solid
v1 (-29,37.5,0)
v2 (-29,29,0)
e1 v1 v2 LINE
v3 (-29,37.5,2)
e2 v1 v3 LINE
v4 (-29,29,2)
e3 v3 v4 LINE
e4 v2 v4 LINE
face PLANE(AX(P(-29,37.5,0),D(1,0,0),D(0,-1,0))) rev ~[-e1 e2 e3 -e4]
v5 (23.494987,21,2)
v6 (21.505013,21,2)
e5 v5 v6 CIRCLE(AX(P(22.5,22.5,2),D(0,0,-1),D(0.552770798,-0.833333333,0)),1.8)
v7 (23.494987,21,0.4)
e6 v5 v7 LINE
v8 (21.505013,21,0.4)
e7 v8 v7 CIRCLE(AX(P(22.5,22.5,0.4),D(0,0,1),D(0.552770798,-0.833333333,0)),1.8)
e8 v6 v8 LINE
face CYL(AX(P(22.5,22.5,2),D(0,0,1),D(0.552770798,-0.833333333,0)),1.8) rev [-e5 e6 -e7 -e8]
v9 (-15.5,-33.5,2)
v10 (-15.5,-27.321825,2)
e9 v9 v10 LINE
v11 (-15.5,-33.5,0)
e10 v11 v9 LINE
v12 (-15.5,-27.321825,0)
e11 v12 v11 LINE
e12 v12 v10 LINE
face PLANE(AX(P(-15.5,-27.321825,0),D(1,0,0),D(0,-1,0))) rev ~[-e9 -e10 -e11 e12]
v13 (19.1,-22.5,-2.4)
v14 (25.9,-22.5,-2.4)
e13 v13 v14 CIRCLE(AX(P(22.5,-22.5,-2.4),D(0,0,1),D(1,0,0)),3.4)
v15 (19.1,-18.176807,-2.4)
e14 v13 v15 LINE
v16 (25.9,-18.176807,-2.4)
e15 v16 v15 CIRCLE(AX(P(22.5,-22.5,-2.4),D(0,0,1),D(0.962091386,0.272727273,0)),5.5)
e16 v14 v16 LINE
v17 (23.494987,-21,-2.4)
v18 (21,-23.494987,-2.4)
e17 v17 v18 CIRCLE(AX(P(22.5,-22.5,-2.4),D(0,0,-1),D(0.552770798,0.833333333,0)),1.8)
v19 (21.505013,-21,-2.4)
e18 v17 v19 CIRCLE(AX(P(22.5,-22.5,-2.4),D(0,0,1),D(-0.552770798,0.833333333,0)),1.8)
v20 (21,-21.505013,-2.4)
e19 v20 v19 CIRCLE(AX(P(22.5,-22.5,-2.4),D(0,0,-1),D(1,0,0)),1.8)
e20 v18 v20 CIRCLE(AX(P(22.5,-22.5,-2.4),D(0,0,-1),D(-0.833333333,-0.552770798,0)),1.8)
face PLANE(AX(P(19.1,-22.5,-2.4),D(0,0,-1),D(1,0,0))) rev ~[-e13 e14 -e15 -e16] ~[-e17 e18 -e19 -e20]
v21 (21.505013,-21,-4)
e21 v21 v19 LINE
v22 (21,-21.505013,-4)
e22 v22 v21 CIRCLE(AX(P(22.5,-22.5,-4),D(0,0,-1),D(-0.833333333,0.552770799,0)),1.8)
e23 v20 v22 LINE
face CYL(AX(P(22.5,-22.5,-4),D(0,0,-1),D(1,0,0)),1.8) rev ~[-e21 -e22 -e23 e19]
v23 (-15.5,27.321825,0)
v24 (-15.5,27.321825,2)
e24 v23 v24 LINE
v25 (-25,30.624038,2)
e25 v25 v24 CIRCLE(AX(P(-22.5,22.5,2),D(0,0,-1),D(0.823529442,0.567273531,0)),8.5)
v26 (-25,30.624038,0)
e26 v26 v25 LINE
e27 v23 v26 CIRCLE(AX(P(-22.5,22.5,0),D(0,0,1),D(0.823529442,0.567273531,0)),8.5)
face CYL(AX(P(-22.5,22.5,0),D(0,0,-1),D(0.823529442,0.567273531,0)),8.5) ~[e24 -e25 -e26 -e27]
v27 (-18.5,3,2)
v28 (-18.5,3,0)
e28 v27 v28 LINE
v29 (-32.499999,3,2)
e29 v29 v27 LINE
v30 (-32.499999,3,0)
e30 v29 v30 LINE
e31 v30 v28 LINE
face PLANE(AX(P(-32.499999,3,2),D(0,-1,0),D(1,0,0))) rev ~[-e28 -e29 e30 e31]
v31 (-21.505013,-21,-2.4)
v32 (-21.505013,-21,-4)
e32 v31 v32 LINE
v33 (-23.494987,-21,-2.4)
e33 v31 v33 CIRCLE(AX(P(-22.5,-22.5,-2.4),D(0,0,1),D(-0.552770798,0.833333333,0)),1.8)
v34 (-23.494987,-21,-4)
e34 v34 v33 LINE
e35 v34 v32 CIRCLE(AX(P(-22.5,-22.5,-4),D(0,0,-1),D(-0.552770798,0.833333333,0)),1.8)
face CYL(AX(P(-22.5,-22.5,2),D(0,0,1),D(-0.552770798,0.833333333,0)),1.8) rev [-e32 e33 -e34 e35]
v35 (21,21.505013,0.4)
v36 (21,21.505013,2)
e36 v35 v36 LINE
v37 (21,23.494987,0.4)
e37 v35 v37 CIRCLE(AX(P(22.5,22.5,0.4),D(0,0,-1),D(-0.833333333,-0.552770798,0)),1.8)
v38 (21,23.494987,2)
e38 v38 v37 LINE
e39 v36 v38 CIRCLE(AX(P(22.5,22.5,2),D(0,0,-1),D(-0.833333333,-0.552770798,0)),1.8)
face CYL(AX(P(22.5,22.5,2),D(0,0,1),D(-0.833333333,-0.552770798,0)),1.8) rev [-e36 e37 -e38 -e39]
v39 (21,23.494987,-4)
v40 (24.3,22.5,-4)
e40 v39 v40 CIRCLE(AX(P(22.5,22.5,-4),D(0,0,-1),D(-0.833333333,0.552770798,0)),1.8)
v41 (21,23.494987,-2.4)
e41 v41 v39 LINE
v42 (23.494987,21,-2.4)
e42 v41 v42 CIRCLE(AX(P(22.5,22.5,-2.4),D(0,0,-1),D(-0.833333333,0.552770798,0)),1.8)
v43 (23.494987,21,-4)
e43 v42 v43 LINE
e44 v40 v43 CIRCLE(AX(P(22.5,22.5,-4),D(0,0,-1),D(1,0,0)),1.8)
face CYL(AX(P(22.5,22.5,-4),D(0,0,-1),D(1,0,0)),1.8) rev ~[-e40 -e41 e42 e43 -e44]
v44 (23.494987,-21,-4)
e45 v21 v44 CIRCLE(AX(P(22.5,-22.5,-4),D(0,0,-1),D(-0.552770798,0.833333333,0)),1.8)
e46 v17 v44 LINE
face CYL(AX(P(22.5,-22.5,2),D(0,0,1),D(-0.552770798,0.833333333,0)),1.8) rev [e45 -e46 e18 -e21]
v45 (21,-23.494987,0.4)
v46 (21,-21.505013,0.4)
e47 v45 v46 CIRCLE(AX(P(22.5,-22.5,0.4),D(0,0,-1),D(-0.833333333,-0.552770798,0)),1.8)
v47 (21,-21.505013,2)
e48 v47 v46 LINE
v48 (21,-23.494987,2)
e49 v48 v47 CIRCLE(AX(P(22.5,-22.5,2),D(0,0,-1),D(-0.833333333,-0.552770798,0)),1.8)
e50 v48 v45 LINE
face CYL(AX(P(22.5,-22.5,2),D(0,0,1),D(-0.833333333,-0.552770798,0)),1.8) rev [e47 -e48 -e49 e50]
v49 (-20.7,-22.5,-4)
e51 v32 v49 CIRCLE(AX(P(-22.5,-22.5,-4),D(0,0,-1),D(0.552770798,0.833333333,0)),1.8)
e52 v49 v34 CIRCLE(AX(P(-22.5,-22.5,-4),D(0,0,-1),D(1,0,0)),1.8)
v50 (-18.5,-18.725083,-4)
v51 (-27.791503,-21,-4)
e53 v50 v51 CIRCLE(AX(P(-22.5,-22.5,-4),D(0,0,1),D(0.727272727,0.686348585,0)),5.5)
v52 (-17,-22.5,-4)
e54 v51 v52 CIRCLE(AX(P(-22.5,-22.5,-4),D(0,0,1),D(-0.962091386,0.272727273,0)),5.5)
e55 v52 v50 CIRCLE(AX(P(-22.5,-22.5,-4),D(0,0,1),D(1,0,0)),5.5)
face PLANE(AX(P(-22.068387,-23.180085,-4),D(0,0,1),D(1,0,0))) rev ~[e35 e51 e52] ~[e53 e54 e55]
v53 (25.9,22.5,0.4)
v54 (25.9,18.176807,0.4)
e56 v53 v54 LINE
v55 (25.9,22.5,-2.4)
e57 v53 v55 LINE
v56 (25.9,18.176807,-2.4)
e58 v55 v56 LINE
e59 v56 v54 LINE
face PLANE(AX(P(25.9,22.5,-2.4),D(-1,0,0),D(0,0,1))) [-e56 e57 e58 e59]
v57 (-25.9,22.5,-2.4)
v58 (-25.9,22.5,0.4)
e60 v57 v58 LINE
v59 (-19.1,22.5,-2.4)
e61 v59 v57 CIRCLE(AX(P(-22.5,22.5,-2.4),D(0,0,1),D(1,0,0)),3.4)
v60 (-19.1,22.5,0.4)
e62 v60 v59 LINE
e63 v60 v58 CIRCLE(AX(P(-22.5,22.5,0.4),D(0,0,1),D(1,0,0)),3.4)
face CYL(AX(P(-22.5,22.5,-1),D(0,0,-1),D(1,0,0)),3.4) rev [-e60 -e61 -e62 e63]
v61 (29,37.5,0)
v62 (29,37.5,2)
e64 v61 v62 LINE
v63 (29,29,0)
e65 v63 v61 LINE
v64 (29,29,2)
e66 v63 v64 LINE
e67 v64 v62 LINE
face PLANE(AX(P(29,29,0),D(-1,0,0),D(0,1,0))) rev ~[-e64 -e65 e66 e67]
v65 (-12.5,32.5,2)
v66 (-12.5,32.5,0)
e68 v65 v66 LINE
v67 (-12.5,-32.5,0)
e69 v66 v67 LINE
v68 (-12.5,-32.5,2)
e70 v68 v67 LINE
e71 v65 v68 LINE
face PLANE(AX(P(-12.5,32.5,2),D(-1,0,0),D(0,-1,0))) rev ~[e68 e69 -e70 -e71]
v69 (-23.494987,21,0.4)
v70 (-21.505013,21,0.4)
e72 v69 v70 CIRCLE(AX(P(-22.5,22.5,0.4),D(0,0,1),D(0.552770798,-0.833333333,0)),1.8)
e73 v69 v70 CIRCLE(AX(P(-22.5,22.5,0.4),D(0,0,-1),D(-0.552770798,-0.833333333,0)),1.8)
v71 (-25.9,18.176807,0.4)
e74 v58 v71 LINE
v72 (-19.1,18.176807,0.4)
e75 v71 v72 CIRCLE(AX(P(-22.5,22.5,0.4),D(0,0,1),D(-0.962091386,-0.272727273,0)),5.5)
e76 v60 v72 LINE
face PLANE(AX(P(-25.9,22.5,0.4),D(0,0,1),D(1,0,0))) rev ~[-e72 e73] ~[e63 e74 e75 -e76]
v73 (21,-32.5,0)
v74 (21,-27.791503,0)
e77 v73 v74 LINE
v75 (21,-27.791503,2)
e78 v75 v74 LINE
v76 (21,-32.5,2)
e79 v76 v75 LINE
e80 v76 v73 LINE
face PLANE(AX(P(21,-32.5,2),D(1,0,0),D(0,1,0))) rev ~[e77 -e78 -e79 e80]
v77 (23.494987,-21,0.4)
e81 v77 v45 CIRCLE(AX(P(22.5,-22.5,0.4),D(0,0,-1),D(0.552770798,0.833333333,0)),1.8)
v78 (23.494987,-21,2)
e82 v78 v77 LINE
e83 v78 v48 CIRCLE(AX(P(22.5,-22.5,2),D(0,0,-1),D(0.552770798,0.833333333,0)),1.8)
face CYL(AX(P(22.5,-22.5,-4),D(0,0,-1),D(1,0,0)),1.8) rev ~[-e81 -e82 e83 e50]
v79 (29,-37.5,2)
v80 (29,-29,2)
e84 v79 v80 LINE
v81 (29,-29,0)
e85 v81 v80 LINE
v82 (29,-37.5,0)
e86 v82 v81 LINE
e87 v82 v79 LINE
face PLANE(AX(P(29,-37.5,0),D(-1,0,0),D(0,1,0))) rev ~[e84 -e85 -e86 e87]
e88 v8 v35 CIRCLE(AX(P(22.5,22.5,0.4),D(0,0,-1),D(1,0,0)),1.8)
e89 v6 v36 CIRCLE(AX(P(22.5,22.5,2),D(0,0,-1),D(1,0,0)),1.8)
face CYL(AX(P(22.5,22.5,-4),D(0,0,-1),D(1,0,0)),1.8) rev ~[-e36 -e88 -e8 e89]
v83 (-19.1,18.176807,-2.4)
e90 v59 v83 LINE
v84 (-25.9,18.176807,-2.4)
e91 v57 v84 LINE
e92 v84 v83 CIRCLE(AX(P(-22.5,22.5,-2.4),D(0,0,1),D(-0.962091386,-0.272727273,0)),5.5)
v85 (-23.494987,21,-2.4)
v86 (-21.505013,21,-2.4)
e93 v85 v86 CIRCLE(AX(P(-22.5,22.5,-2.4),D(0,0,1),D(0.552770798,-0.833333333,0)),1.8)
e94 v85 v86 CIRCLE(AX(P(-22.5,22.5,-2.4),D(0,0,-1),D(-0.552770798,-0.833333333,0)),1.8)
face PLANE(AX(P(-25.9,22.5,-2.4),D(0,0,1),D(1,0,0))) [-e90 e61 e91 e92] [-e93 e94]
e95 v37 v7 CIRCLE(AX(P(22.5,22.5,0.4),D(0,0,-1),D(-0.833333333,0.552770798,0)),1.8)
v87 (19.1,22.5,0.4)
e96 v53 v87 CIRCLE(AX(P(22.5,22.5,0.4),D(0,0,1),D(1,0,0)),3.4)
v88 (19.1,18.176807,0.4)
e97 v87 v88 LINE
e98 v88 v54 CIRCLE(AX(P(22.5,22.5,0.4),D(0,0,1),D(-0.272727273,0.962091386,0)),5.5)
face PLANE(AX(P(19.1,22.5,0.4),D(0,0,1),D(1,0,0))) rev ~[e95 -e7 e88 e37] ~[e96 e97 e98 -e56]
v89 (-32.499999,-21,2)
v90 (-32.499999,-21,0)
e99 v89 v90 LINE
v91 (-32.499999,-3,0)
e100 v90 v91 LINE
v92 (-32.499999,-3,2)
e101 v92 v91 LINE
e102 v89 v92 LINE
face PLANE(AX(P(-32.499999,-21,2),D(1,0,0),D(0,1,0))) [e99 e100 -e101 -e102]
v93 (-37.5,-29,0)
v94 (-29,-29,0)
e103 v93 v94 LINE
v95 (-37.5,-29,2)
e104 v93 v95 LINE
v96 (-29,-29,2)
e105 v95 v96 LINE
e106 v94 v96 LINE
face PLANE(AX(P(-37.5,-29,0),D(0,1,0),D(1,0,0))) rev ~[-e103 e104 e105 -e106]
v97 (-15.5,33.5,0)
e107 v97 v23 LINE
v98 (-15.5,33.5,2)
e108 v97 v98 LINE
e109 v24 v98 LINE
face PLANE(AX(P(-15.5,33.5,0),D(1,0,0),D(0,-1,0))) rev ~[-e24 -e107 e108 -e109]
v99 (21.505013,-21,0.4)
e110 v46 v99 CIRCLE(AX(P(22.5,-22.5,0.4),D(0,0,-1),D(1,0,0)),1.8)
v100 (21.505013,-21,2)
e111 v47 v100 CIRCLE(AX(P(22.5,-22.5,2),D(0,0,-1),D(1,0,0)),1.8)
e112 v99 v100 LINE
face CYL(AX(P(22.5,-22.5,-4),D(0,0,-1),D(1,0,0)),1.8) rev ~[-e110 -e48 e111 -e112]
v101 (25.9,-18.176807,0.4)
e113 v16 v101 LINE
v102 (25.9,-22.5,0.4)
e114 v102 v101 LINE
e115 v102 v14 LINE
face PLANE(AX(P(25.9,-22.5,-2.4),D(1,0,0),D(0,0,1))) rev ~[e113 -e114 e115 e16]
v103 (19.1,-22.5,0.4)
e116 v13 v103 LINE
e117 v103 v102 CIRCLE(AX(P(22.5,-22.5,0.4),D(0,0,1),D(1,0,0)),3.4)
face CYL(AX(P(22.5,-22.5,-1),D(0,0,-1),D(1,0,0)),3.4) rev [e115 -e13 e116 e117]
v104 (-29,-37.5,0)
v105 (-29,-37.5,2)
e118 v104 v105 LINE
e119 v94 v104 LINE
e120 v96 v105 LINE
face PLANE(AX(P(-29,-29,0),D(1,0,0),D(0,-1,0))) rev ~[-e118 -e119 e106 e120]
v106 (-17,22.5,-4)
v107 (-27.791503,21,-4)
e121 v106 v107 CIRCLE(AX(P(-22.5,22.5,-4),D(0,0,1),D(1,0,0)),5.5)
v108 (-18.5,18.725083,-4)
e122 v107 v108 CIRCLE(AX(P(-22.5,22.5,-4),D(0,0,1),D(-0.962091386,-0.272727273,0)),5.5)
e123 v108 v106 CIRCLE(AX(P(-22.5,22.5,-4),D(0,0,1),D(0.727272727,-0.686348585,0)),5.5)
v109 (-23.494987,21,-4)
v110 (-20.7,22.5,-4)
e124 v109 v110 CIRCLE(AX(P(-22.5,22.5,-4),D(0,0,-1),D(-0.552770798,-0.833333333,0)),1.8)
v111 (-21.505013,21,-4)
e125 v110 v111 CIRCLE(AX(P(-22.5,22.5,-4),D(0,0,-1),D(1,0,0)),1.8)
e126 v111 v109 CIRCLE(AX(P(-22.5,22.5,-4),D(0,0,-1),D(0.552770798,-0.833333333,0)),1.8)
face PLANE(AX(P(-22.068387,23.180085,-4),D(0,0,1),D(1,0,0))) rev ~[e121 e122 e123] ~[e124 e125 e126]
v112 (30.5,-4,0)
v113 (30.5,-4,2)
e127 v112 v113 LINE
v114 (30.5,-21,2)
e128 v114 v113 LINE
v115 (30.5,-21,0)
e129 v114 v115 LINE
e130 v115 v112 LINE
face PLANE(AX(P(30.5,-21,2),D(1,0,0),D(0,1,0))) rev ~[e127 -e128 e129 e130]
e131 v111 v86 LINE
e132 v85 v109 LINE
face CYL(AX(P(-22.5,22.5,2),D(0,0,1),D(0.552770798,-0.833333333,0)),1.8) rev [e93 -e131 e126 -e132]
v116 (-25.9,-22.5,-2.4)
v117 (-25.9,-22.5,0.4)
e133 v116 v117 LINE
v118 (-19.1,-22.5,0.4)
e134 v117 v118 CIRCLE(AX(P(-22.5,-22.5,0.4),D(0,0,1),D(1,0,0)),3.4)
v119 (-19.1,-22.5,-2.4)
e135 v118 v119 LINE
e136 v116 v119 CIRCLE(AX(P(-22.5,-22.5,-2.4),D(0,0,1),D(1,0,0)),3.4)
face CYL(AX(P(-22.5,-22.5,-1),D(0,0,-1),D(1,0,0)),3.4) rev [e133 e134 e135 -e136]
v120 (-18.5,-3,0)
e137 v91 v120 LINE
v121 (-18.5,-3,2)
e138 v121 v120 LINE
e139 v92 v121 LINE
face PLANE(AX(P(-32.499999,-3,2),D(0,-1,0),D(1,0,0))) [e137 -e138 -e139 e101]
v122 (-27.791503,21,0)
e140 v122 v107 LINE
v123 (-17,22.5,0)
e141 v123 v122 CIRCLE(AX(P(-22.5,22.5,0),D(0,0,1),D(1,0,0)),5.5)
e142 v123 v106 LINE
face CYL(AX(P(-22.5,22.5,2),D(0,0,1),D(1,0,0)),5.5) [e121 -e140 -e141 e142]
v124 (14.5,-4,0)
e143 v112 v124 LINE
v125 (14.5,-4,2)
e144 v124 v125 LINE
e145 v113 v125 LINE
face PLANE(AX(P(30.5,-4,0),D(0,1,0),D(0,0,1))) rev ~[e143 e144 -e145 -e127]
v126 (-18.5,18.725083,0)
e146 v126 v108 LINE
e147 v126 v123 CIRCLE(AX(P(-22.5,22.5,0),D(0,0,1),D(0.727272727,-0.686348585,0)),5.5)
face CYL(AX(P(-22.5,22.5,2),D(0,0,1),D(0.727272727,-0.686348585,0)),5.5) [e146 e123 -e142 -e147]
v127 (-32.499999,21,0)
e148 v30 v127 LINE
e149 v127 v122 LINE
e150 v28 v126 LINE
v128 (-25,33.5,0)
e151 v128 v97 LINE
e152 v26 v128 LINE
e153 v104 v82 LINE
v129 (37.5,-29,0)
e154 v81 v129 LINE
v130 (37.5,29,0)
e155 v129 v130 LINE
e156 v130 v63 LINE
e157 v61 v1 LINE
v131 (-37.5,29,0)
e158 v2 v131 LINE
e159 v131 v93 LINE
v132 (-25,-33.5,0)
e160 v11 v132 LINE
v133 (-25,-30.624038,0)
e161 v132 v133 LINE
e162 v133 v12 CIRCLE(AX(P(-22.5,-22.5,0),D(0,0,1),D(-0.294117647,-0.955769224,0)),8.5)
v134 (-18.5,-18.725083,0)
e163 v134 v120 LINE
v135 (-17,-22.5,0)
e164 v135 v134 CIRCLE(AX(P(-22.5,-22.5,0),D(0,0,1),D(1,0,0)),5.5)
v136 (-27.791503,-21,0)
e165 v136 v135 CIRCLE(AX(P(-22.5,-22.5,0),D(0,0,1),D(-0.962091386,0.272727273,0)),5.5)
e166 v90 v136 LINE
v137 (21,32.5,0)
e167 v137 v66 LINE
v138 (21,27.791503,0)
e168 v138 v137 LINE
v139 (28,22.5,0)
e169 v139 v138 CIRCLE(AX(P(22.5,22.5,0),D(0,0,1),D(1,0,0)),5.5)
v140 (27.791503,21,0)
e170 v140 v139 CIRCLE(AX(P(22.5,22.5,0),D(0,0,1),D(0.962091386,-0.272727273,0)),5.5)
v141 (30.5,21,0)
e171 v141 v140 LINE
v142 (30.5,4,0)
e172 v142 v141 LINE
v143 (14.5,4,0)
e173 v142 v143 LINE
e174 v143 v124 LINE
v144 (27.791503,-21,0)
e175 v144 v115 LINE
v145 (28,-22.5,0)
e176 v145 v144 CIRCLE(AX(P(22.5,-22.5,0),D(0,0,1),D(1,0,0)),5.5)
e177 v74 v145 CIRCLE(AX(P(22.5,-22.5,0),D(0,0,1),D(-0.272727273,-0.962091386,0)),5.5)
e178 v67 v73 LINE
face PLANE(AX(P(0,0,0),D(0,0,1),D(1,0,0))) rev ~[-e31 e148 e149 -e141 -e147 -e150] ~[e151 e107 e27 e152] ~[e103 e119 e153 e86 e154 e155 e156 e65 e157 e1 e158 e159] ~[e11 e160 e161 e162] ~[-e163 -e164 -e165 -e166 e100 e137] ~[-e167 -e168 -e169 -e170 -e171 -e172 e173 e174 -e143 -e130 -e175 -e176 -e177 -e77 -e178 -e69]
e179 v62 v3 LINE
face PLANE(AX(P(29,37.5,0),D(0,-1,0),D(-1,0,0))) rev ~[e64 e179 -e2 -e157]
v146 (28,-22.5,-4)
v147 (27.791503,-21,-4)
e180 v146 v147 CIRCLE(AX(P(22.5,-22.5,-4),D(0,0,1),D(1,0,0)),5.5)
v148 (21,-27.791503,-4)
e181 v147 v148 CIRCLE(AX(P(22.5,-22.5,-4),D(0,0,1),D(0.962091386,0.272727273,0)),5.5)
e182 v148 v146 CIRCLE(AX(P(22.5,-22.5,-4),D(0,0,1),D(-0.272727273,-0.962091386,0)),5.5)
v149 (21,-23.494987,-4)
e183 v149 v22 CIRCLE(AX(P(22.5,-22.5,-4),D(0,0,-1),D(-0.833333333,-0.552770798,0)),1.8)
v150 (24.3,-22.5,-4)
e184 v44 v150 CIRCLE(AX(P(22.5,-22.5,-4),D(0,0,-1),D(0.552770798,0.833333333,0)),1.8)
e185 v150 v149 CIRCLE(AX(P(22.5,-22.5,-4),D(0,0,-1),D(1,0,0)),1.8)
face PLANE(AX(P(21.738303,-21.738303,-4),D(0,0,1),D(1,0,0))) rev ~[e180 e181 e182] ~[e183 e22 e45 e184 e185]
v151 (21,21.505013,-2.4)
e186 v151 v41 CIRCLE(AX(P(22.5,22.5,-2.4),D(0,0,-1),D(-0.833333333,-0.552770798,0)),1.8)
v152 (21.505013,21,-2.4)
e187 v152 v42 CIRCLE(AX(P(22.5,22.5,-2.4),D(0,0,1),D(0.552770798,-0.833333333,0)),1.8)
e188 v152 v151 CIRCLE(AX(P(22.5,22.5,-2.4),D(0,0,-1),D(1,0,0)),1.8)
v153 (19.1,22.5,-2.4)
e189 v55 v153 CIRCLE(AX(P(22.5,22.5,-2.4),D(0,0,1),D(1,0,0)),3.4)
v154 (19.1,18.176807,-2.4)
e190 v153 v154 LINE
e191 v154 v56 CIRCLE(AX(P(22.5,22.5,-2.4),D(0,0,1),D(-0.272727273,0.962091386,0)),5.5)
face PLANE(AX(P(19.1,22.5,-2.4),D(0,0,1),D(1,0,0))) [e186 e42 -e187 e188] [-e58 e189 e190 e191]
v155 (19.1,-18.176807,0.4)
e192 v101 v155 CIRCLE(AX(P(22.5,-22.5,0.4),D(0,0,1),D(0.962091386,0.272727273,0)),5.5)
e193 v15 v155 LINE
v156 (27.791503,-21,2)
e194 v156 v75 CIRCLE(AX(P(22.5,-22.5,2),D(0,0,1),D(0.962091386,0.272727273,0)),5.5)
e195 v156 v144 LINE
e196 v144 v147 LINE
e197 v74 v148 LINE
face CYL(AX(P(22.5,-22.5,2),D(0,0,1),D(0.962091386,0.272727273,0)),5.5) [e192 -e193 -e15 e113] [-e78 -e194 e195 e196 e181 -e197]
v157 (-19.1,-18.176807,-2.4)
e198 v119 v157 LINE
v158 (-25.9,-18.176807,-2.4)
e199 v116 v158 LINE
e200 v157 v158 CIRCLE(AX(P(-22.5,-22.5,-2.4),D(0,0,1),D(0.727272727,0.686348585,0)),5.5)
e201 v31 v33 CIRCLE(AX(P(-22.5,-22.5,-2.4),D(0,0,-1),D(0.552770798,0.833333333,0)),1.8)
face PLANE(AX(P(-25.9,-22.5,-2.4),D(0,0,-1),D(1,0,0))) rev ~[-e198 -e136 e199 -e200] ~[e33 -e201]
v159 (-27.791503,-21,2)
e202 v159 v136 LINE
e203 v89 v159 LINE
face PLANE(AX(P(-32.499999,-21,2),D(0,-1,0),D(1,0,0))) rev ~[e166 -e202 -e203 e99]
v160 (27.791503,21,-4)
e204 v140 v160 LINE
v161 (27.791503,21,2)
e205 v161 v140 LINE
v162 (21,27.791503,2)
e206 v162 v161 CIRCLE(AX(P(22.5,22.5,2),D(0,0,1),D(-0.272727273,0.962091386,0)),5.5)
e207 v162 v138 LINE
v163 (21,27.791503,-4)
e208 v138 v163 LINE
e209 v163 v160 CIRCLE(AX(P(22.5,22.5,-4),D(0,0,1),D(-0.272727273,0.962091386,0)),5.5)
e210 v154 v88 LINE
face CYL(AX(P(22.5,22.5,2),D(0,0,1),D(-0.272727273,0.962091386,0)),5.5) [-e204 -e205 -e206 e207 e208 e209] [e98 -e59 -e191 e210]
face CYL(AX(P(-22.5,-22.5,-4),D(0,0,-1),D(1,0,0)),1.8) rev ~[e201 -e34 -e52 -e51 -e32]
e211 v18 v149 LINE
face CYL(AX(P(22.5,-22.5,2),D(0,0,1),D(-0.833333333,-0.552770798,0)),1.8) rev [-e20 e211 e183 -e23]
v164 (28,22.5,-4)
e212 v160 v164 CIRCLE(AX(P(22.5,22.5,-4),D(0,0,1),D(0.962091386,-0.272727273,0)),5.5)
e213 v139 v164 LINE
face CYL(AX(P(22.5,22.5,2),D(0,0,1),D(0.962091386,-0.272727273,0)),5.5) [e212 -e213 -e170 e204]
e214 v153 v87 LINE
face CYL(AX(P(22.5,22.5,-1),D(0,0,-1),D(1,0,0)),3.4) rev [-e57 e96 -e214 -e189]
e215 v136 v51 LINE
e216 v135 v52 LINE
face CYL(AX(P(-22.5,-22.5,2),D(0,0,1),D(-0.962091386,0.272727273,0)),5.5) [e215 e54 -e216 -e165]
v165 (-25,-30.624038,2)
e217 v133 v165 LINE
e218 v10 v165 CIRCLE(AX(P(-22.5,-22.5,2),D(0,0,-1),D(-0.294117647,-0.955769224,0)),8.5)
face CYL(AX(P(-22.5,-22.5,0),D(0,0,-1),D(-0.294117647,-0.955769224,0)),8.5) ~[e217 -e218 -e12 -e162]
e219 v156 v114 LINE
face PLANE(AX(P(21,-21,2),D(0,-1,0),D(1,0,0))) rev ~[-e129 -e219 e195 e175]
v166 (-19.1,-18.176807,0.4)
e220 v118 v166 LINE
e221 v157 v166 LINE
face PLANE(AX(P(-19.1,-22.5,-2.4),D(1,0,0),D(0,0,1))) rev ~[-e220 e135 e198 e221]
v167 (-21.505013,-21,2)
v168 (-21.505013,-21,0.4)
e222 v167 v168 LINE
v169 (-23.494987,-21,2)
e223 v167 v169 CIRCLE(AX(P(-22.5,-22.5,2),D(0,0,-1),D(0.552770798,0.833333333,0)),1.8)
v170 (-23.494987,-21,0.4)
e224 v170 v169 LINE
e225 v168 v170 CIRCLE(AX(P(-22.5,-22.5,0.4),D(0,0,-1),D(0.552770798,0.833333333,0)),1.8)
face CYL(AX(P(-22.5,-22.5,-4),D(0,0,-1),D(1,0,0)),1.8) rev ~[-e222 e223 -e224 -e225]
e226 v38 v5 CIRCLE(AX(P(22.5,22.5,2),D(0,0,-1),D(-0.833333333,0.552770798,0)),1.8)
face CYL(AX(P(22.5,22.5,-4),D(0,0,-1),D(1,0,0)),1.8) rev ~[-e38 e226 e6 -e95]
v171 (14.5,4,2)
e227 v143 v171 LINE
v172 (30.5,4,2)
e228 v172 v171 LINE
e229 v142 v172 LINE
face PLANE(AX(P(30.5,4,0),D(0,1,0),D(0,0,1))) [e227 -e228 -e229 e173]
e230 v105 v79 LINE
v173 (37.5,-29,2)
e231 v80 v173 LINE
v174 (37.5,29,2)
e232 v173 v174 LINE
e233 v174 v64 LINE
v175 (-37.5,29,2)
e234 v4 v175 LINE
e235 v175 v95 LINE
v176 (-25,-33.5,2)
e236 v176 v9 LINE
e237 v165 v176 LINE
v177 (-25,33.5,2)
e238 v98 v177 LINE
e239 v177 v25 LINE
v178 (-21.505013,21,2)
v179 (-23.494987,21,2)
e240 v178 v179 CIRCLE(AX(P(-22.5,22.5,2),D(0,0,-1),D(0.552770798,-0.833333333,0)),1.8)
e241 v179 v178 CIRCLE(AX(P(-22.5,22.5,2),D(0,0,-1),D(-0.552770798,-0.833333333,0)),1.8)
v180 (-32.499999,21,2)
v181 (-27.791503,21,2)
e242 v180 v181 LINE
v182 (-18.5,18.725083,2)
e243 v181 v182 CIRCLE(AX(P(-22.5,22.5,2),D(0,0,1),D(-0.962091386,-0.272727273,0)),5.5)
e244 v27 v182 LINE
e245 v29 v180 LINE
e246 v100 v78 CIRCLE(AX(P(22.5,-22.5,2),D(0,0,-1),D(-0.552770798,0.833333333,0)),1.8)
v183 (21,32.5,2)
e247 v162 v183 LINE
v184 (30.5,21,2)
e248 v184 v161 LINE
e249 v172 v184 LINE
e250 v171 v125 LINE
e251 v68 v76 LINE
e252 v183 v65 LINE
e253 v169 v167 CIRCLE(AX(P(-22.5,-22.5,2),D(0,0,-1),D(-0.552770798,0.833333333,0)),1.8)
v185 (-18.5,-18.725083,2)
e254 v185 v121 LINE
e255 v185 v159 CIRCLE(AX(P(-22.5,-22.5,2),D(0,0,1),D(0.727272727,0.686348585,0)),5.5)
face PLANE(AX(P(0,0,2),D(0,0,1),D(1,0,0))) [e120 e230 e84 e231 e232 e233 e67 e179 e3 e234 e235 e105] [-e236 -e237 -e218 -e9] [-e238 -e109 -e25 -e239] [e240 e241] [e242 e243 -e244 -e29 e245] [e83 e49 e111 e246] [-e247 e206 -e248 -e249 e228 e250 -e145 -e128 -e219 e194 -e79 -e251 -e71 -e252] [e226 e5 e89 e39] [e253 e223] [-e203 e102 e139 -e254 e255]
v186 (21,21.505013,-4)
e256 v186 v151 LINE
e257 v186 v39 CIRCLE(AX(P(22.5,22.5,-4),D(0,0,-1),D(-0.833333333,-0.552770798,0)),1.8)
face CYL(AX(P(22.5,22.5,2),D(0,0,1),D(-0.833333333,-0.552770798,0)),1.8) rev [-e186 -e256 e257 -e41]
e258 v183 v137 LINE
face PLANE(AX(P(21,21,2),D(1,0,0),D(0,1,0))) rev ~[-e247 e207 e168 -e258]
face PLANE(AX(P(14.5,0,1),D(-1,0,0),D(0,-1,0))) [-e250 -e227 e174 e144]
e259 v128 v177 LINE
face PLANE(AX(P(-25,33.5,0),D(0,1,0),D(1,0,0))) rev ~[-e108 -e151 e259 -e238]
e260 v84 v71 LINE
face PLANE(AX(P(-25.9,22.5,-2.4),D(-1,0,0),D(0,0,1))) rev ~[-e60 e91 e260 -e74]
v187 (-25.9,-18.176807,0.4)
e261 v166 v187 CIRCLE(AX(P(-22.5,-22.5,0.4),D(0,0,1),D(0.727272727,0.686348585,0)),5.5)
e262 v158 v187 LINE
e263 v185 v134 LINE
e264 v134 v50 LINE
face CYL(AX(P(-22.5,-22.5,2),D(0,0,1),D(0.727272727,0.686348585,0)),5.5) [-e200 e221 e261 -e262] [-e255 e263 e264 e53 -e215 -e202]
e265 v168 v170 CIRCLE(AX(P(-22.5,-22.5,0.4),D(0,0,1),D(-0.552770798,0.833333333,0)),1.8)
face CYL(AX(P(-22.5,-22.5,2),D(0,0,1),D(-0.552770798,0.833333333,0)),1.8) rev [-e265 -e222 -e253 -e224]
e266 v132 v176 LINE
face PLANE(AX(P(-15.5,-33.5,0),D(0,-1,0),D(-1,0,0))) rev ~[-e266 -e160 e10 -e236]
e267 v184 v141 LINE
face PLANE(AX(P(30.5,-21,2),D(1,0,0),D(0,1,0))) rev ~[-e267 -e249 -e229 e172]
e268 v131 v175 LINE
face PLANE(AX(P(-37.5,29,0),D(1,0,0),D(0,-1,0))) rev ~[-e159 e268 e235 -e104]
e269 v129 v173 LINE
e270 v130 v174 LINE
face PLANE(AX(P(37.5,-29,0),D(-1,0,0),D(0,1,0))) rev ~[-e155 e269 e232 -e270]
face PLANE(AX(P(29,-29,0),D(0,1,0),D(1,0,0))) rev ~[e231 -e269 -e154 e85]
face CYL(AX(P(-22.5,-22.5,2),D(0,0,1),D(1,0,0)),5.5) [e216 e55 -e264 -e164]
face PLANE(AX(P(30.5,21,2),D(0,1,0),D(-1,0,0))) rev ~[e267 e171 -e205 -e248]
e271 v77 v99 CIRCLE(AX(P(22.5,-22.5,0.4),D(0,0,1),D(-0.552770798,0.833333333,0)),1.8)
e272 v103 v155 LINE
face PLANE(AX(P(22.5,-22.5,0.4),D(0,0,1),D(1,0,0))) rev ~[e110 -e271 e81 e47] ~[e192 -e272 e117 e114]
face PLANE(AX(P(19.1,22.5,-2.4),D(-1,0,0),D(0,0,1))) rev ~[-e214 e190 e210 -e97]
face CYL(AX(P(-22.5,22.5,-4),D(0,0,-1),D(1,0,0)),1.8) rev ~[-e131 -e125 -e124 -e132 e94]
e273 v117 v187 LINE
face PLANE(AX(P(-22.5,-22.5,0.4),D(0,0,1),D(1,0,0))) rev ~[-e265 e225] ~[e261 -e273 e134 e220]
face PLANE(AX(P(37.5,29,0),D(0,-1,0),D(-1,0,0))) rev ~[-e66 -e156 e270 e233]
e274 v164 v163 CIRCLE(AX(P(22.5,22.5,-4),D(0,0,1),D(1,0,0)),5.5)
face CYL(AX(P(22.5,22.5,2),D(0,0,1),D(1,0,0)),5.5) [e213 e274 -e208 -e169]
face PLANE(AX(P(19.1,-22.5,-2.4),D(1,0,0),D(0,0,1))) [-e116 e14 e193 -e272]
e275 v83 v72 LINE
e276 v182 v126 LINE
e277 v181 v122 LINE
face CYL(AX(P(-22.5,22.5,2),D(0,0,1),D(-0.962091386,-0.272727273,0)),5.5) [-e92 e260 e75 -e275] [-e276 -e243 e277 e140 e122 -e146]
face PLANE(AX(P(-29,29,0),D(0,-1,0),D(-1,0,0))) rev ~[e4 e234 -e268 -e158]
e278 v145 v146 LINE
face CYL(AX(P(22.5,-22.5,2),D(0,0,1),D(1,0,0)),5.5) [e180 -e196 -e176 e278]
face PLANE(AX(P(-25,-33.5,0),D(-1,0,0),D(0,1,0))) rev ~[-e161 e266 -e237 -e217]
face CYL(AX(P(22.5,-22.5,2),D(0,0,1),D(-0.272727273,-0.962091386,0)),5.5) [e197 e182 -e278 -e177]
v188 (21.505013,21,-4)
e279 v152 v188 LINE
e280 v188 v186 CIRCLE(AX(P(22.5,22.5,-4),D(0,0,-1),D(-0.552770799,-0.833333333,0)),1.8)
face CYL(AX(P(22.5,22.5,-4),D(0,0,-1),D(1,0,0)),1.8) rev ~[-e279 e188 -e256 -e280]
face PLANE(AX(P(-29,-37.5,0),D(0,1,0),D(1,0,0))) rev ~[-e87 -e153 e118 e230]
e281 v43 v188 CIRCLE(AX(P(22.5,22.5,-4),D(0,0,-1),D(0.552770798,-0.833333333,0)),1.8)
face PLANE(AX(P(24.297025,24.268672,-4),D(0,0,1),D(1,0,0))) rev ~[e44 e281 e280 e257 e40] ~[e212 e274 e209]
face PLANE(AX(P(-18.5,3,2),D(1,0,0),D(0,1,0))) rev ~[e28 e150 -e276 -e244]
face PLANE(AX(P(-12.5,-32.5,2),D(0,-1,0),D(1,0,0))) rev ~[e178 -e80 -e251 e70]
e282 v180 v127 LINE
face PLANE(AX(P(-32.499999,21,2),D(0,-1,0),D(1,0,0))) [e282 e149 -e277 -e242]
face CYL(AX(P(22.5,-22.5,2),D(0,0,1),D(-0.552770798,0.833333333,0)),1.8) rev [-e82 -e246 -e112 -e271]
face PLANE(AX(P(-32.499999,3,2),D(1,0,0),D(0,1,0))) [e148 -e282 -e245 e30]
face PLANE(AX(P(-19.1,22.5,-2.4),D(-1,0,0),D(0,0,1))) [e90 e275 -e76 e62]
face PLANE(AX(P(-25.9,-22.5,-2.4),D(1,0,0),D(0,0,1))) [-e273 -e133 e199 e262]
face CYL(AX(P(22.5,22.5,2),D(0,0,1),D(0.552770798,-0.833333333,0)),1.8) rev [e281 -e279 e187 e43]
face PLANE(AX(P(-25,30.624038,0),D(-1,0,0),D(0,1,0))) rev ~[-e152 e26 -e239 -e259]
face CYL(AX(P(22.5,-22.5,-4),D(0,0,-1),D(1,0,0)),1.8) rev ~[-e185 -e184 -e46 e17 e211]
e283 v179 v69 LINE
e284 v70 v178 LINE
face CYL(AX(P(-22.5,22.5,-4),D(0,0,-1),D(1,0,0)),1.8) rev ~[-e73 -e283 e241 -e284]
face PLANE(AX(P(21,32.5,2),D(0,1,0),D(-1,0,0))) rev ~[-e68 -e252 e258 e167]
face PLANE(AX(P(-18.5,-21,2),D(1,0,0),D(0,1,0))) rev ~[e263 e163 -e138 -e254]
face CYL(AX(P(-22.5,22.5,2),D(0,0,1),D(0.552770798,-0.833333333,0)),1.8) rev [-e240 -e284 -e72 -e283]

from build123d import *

# Parameters (mm, degrees)
F2_DEPTH       = 2
F3_W           = 13.9999988079
F3_H           = 18
F4_DEPTH       = 2.001
F6_DEPTH       = 6
F7_R           = 1.8
F8_DEPTH       = 6.001
F10_R          = 3.4
F11_DEPTH      = 1.4
F11_DEPTH_BACK = 1.4
F13_W          = 6.8
F13_H          = 2.8
F14_DEPTH      = 8.8
F16_W          = 6.8
F16_H          = 2.8
F17_DEPTH      = 10.3
F18_W          = 8
F18_H          = 2
F19_DEPTH      = 16
F21_DEPTH      = 2.001


# Not quite as in the source:
# - after a boolean that leaves OpenCascade's solid faulty, fix() repairs it
# - a feature names something its author has since deleted; it is built from what else it names


with BuildPart() as f2:
    # F1 (on Top) → F2 (new body)
    with BuildSketch(Plane.XY):
        Polygon((29, 29), (29, 37.5), (-29, 37.5), (-29, 29), (-37.5, 29), (-37.5, -29), (-29, -29), (-29, -37.5), (29, -37.5), (29, -29), (37.5, -29), (37.5, 29), align=None)
    extrude(amount=F2_DEPTH)

    # F3 (on face) → F4 (cut, through all)
    with BuildSketch(Plane.XY.offset(2)):
        with Locations((-25.499999404, 12)):
            Rectangle(F3_W, F3_H)
        with Locations((-25.499999404, -12)):
            Rectangle(F3_W, F3_H)
        Polygon((-12.5, -32.5), (21, -32.5), (21, -21), (30.5, -21), (30.5, 21), (21, 21), (21, 32.5), (-12.5, 32.5), align=None)
    extrude(amount=-F4_DEPTH, mode=Mode.SUBTRACT)

    # F5 (on face) → F6 (join)
    with BuildSketch(Plane.XY.offset(2)):
        with BuildLine():
            ThreePointArc((-23.4949874371, 21), (-23.3511822993, 24.0860292221), (-20.7, 22.5))
            ThreePointArc((-20.7, 22.5), (-20.9139707779, 21.6488177007), (-21.5050125629, 21))
            Line((-21.5050125629, 21), (-18.5, 21))
            Line((-18.5, 21), (-18.5, 18.7250827824))
            ThreePointArc((-18.5, 18.7250827824), (-17.3887379249, 20.4689903988), (-17, 22.5))
            ThreePointArc((-17, 22.5), (-23.2572105316, 27.9476262914), (-27.7915026221, 21))
            Line((-27.7915026221, 21), (-23.4949874371, 21))
        make_face()
        with BuildLine():
            ThreePointArc((-21.5050125629, 21), (-22.5, 20.7), (-23.4949874371, 21))
            Line((-23.4949874371, 21), (-27.7915026221, 21))
            ThreePointArc((-27.7915026221, 21), (-23.8079781506, 17.1577913596), (-18.5, 18.7250827824))
            Line((-18.5, 18.7250827824), (-18.5, 21))
            Line((-18.5, 21), (-21.5050125629, 21))
        make_face()
        with BuildLine():
            ThreePointArc((-21.5050125629, -21), (-20.9139707779, -21.6488177007), (-20.7, -22.5))
            ThreePointArc((-20.7, -22.5), (-23.3511822993, -24.0860292221), (-23.4949874371, -21))
            Line((-23.4949874371, -21), (-27.7915026221, -21))
            ThreePointArc((-27.7915026221, -21), (-23.2572105316, -27.9476262914), (-17, -22.5))
            ThreePointArc((-17, -22.5), (-17.3887379249, -20.4689903988), (-18.5, -18.7250827824))
            Line((-18.5, -18.7250827824), (-18.5, -21))
            Line((-18.5, -21), (-21.5050125629, -21))
        make_face()
        with BuildLine():
            ThreePointArc((-23.4949874371, -21), (-22.5, -20.7), (-21.5050125629, -21))
            Line((-21.5050125629, -21), (-18.5, -21))
            Line((-18.5, -21), (-18.5, -18.7250827824))
            ThreePointArc((-18.5, -18.7250827824), (-23.8079781506, -17.1577913596), (-27.7915026221, -21))
            Line((-27.7915026221, -21), (-23.4949874371, -21))
        make_face()
        with BuildLine():
            ThreePointArc((21, 23.4949874371), (23.0196152423, 24.223368794), (24.3, 22.5))
            ThreePointArc((24.3, 22.5), (24.0860292221, 21.6488177007), (23.4949874371, 21))
            Line((23.4949874371, 21), (27.7915026221, 21))
            ThreePointArc((27.7915026221, 21), (27.9476262914, 21.7427894684), (28, 22.5))
            ThreePointArc((28, 22.5), (25.8166247904, 26.8874821937), (21, 27.7915026221))
            Line((21, 27.7915026221), (21, 23.4949874371))
        make_face()
        with BuildLine():
            ThreePointArc((21, 21.5050125629), (20.7, 22.5), (21, 23.4949874371))
            Line((21, 23.4949874371), (21, 27.7915026221))
            ThreePointArc((21, 27.7915026221), (18.6109127035, 18.6109127035), (27.7915026221, 21))
            Line((27.7915026221, 21), (23.4949874371, 21))
            ThreePointArc((23.4949874371, 21), (22.5, 20.7), (21.5050125629, 21))
            Line((21.5050125629, 21), (21, 21))
            Line((21, 21), (21, 21.5050125629))
        make_face()
        with BuildLine():
            ThreePointArc((21.5050125629, 21), (21.2272077939, 21.2272077939), (21, 21.5050125629))
            Line((21, 21.5050125629), (21, 21))
            Line((21, 21), (21.5050125629, 21))
        make_face()
        with BuildLine():
            Line((23.4949874371, -21), (27.7915026221, -21))
            ThreePointArc((27.7915026221, -21), (18.6109127035, -18.6109127035), (21, -27.7915026221))
            Line((21, -27.7915026221), (21, -23.4949874371))
            ThreePointArc((21, -23.4949874371), (20.7, -22.5), (21, -21.5050125629))
            Line((21, -21.5050125629), (21, -21))
            Line((21, -21), (21.5050125629, -21))
            ThreePointArc((21.5050125629, -21), (22.5, -20.7), (23.4949874371, -21))
        make_face()
        with BuildLine():
            ThreePointArc((28, -22.5), (27.9476262914, -21.7427894684), (27.7915026221, -21))
            Line((27.7915026221, -21), (23.4949874371, -21))
            ThreePointArc((23.4949874371, -21), (24.0860292221, -21.6488177007), (24.3, -22.5))
            ThreePointArc((24.3, -22.5), (23.0196152423, -24.223368794), (21, -23.4949874371))
            Line((21, -23.4949874371), (21, -27.7915026221))
            ThreePointArc((21, -27.7915026221), (25.8166247904, -26.8874821937), (28, -22.5))
        make_face()
        with BuildLine():
            ThreePointArc((21, -21.5050125629), (21.2272077939, -21.2272077939), (21.5050125629, -21))
            Line((21.5050125629, -21), (21, -21))
            Line((21, -21), (21, -21.5050125629))
        make_face()
    extrude(amount=-F6_DEPTH)

    # F7 (on face) → F8 (cut, through all)
    with BuildSketch(Plane(origin=(0, 0, -4), x_dir=(1, 0, 0), z_dir=(0, 0, -1))):
        with Locations((-22.5, -22.5)):
            Circle(F7_R)
        with Locations((-22.5, 22.5)):
            Circle(F7_R)
        with Locations((22.5, -22.5)):
            Circle(F7_R)
        with Locations((22.5, 22.5)):
            Circle(F7_R)
    extrude(amount=-F8_DEPTH, mode=Mode.SUBTRACT)

    add(f2.part.fix(), mode=Mode.REPLACE)

    # F10 (on offset) → F11 (cut, two sides)
    with BuildSketch(Plane.XY.offset(-1)) as f11_sk:
        with Locations((22.5, -22.5)):
            Circle(F10_R)
        with Locations((22.5, 22.5)):
            Circle(F10_R)
        with Locations((-22.5, -22.5)):
            Circle(F10_R)
        with Locations((-22.5, 22.5)):
            Circle(F10_R)
    extrude(amount=-F11_DEPTH, mode=Mode.SUBTRACT)
    extrude(f11_sk.sketch, amount=F11_DEPTH_BACK, mode=Mode.SUBTRACT)

    # F13 (on offset) → F14 (cut)
    with BuildSketch(Plane.XZ.offset(22.5)):
        with Locations((22.5, -1)):
            Rectangle(F13_W, F13_H)
        with Locations((-22.5, -1)):
            Rectangle(F13_W, F13_H)
    extrude(amount=-F14_DEPTH, mode=Mode.SUBTRACT)

    # F16 (on offset) → F17 (cut)
    with BuildSketch(Plane.XZ.offset(-22.5)):
        with Locations((22.5, -1)):
            Rectangle(F16_W, F16_H)
        with Locations((-22.5, -1)):
            Rectangle(F16_W, F16_H)
    extrude(amount=F17_DEPTH, mode=Mode.SUBTRACT)

    # F18 (on face) → F19 (join)
    with BuildSketch(Plane(origin=(30.5, 0, 0), x_dir=(0, -1, 0), z_dir=(-1, 0, 0))):
        with Locations((0, 1)):
            Rectangle(F18_W, F18_H)
    extrude(amount=F19_DEPTH)

    # F20 (on face) → F21 (cut, through all)
    with BuildSketch(Plane(origin=(0, 0, 0), x_dir=(1, 0, 0), z_dir=(0, 0, -1))):
        with BuildLine():
            ThreePointArc((-25, 30.6240384046), (-19.7091840098, 30.5287823553), (-15.4999997467, 27.3218250127))
            Line((-15.4999997467, 27.3218250127), (-15.4999997467, 33.5))
            Line((-15.4999997467, 33.5), (-25, 33.5))
            Line((-25, 33.5), (-25, 30.6240384046))
        make_face()
        with BuildLine():
            Line((-25, -33.5), (-15.4999997467, -33.5))
            Line((-15.4999997467, -33.5), (-15.4999997467, -27.3218250127))
            ThreePointArc((-15.4999997467, -27.3218250127), (-19.7091840098, -30.5287823553), (-25, -30.6240384046))
            Line((-25, -30.6240384046), (-25, -33.5))
        make_face()
    extrude(amount=-F21_DEPTH, mode=Mode.SUBTRACT)


solid = f2.part
